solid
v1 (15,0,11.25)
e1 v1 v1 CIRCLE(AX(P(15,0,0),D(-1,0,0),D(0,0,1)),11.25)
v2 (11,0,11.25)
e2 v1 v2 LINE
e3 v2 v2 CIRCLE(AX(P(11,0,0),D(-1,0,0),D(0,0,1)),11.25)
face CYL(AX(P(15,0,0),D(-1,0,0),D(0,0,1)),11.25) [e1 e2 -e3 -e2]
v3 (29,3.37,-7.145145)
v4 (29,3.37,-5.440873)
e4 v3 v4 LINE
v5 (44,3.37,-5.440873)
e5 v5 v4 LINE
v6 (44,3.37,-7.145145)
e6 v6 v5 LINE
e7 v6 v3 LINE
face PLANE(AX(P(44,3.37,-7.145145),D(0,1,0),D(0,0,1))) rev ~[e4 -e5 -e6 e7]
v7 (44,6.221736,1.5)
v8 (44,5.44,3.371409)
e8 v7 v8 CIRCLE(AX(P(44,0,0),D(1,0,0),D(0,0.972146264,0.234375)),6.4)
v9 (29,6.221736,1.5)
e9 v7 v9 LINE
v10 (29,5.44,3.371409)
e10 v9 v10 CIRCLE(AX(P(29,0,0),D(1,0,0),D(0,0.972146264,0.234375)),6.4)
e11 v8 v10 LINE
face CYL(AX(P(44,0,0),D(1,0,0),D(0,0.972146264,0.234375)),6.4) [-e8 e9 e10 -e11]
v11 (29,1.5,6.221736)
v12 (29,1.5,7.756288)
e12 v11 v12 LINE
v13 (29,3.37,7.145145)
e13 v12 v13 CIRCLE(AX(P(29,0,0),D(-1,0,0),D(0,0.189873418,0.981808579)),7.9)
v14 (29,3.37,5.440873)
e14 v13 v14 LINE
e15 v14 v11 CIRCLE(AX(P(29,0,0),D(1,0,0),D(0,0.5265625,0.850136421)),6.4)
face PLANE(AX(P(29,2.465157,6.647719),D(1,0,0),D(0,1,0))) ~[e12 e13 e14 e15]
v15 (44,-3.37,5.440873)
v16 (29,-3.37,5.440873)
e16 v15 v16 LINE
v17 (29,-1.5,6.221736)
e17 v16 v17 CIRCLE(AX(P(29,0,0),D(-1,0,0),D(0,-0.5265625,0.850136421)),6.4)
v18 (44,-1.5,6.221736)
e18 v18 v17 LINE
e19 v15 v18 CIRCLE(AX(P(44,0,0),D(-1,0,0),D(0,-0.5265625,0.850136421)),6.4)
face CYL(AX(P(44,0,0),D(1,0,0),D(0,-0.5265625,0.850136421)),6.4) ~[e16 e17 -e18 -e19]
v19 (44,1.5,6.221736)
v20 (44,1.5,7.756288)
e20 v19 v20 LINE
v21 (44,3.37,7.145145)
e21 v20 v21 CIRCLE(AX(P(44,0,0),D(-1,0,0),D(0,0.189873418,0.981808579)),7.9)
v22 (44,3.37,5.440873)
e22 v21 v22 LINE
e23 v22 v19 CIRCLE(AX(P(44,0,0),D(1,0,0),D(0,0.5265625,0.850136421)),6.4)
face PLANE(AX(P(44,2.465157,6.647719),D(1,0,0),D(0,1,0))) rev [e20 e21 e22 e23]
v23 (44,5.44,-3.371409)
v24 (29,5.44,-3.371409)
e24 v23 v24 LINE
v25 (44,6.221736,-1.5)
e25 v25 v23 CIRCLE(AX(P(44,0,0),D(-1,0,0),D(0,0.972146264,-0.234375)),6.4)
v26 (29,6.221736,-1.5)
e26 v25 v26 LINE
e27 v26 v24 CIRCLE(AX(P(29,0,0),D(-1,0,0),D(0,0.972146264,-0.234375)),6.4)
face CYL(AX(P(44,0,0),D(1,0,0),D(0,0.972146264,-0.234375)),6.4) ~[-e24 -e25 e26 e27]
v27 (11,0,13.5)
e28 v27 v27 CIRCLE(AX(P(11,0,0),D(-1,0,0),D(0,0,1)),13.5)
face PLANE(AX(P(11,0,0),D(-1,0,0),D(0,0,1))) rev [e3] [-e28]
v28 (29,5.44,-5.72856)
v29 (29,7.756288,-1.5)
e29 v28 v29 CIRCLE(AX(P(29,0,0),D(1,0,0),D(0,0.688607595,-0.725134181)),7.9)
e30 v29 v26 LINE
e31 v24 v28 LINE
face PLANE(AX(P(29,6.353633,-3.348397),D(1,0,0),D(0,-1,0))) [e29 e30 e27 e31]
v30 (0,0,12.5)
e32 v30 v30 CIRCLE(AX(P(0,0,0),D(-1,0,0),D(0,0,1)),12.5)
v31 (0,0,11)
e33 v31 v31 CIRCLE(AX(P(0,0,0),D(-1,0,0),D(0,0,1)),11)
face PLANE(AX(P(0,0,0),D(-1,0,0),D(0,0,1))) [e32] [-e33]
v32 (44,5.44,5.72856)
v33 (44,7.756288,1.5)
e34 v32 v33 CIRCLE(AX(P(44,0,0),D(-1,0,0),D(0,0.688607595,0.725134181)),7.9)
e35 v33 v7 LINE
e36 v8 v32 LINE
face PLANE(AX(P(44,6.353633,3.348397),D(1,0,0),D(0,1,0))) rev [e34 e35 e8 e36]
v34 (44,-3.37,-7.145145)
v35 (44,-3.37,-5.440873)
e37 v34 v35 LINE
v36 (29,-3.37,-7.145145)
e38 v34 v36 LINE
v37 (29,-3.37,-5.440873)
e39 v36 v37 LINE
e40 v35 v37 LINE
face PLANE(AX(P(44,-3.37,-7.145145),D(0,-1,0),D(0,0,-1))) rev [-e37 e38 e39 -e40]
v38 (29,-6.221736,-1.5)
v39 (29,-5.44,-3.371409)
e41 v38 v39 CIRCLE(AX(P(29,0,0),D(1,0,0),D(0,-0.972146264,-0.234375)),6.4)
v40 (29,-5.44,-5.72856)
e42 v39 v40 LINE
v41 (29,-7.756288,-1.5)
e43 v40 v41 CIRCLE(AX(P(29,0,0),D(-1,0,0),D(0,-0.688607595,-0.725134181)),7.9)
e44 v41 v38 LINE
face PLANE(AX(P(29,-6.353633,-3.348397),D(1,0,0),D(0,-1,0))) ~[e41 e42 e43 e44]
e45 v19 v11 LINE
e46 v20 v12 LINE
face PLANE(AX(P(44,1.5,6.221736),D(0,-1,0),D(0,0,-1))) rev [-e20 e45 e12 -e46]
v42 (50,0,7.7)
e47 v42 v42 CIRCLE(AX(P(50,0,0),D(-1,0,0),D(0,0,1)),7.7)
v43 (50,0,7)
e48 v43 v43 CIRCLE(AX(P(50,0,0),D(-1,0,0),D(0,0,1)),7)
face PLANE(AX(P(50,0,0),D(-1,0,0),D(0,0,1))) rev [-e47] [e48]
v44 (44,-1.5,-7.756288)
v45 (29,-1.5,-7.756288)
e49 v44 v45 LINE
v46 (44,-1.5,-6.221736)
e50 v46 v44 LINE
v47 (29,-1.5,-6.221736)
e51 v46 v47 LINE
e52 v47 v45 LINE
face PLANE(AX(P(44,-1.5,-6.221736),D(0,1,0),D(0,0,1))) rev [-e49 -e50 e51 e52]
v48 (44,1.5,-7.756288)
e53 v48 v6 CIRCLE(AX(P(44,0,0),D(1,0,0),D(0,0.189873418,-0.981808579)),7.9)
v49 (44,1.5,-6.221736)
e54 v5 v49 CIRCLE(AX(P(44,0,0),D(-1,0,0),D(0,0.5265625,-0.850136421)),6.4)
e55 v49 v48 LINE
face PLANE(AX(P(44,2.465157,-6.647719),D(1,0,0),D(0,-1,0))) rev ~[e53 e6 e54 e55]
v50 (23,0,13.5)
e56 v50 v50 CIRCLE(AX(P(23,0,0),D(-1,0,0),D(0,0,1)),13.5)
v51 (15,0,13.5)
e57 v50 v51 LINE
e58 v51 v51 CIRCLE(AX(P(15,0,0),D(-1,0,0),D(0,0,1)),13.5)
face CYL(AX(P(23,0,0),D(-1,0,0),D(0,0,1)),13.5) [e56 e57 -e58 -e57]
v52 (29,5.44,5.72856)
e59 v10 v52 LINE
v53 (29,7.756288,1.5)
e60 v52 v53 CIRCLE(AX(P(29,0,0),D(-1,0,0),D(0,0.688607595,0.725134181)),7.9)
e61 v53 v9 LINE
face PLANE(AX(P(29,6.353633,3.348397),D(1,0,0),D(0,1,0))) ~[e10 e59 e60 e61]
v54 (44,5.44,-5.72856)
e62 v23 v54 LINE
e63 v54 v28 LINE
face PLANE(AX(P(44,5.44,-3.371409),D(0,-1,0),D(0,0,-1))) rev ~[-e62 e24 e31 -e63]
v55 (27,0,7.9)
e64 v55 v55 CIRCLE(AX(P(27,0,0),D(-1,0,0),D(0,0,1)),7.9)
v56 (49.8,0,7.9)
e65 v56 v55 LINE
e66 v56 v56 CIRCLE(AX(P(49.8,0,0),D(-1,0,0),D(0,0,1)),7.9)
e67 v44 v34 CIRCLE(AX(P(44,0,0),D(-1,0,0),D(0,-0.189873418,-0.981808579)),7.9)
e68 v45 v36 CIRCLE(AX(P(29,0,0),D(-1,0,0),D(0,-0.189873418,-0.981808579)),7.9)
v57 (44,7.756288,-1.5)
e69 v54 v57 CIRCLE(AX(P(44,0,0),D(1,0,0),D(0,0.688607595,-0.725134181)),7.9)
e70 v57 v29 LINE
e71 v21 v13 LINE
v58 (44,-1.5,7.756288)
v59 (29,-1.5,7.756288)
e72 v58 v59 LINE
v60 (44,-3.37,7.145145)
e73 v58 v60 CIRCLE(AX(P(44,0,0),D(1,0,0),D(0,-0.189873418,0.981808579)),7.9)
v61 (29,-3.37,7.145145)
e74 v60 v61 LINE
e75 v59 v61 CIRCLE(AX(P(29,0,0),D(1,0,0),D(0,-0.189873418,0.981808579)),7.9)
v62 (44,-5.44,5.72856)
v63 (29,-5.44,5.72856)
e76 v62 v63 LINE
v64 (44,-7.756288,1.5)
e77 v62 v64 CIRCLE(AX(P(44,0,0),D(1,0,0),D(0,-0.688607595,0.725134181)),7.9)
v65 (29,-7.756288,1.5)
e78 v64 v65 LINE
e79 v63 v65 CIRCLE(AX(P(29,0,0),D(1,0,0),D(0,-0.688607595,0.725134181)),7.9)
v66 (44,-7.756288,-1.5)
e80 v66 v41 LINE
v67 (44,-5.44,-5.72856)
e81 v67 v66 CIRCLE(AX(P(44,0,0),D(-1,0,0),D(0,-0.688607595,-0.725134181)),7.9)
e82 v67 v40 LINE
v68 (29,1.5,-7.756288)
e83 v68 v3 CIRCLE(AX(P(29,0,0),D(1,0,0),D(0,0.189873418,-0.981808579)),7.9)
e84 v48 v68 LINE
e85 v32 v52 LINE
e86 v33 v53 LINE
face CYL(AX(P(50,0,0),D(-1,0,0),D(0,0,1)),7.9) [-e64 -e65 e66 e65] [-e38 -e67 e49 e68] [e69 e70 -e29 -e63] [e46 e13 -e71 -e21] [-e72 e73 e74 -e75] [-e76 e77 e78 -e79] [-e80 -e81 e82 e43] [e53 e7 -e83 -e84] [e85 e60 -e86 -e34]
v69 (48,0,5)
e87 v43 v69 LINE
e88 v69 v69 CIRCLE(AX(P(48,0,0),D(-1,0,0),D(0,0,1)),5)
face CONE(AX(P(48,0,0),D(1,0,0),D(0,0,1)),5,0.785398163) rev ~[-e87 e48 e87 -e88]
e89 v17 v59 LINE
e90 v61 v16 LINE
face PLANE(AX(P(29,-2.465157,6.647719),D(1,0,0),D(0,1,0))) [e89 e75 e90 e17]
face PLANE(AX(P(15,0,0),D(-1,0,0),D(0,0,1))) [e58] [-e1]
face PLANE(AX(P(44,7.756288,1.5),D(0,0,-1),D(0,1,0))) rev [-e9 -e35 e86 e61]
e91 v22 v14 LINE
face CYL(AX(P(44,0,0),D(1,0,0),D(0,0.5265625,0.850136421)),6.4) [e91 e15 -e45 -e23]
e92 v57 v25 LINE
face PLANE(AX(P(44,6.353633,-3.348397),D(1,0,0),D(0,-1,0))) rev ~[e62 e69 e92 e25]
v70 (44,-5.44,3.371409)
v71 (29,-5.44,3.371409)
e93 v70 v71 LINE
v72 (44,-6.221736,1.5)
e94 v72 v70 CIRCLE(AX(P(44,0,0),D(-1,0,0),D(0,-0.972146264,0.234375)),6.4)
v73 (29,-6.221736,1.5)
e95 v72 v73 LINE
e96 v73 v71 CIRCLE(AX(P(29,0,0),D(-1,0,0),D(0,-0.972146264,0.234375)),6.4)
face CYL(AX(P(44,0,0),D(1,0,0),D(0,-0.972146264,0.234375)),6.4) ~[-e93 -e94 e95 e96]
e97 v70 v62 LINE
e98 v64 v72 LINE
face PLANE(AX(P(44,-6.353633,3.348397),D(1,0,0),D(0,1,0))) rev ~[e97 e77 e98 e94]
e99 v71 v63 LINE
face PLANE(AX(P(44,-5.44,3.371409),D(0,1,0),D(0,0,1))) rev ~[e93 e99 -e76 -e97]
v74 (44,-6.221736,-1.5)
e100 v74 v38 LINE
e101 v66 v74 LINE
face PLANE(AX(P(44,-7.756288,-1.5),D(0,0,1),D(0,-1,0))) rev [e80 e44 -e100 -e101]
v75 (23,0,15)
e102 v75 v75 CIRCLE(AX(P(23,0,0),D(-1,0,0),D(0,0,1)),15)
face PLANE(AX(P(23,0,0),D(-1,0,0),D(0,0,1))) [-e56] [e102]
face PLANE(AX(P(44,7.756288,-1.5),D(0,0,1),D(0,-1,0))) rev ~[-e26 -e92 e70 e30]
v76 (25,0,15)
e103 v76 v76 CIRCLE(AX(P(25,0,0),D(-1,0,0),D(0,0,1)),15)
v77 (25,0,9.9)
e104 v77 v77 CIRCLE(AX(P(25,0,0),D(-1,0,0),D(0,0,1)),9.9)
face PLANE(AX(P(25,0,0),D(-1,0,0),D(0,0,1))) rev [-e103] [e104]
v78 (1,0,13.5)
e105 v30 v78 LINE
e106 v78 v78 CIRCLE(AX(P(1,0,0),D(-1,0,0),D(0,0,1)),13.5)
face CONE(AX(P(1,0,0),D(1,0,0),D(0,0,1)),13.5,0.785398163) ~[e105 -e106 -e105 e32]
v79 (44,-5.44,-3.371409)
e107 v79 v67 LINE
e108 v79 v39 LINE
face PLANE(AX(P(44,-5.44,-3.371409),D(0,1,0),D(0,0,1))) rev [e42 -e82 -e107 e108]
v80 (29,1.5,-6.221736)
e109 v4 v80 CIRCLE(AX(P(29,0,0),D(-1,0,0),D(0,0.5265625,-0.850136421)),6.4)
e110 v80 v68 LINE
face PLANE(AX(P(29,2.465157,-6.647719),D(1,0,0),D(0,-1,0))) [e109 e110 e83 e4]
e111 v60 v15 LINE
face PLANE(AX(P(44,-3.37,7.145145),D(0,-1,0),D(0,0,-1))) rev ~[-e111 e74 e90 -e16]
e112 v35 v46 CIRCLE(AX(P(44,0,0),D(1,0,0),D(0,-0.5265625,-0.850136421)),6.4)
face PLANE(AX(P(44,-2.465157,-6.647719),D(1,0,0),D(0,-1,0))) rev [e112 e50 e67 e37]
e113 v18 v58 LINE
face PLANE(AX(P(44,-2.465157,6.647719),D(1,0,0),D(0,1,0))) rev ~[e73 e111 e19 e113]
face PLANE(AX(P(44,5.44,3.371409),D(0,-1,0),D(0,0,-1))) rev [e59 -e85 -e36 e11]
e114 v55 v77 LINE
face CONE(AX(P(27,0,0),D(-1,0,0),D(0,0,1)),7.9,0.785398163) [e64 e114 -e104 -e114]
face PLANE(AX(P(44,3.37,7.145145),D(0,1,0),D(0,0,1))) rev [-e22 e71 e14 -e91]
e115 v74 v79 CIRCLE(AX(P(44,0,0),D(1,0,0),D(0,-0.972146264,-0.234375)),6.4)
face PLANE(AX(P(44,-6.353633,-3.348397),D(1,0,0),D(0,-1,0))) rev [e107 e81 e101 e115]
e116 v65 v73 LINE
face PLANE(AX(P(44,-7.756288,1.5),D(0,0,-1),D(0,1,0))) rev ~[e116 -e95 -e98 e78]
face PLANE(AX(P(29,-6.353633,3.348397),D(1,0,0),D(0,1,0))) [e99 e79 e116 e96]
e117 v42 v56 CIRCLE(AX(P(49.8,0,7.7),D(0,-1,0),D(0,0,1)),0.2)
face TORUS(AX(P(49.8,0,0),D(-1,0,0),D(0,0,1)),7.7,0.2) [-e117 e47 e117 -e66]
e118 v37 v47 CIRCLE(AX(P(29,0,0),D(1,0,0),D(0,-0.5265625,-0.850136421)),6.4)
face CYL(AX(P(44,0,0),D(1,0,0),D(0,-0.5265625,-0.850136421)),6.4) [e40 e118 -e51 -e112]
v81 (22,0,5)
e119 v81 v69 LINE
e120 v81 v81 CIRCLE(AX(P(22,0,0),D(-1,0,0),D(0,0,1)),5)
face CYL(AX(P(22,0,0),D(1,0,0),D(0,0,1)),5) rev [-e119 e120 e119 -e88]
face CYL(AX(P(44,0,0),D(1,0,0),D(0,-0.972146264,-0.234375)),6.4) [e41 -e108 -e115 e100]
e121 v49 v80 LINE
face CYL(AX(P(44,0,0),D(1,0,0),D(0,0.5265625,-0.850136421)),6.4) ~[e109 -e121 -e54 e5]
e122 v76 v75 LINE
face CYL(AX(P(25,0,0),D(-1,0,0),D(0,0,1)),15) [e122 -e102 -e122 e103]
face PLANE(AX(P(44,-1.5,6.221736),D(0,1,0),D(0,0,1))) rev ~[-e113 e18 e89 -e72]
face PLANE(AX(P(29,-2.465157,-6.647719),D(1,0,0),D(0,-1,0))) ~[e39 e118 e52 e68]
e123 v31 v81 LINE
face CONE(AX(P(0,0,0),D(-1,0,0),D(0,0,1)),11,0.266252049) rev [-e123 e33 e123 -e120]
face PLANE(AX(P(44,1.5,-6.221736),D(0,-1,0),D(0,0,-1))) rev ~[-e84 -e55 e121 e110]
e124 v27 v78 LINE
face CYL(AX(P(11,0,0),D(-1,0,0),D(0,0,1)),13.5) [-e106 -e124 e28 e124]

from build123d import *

# Parameters (mm, degrees)
F2_R             = 0.2
F3_SIZE          = 2
F4_SIZE          = 1
F7_DEPTH         = 15
F7_COPIES2_COUNT = 2


# Not quite as in the source:
# - a pattern or mirror of a feature is missing from the dataset's text; its kind, count and spacing are read off the source's solid


with BuildPart() as f1:
    # F0 (on Front) → F1 (revolve)
    with BuildSketch(Plane.XZ):
        Polygon((0, 13.5), (0, 11), (22, 5), (50, 5), (50, 7.9), (25, 7.9), (25, 15), (23, 15), (23, 13.5), (15, 13.5), (15, 11.25), (11, 11.25), (11, 13.5), align=None)
    revolve(axis=Axis((18.4335876124, 0, 0), (-1, 0, 0)))

    # F2
    f2_edges = [f1.edges().sort_by_distance(p)[0] for p in [
        (50, 0, -7.9),
    ]]
    fillet(f2_edges, radius=F2_R)

    # F3
    f3_edges = [f1.edges().sort_by_distance(p)[0] for p in [
        (50, 0, -5),
        (25, 0, -7.9),
    ]]
    chamfer(f3_edges, length=F3_SIZE)

    # F4
    f4_edges = [f1.edges().sort_by_distance(p)[0] for p in [
        (0, 0, -13.5),
    ]]
    chamfer(f4_edges, length=F4_SIZE)

    # F6 (on offset) → F7 (cut)
    with BuildSketch(Plane.YZ.offset(44)):
        with BuildLine():
            ThreePointArc((-3.37, 5.4408730917), (-2.4661025438, 5.905788537), (-1.5, 6.2217360921))
            Line((-1.5, 6.2217360921), (-1.5, 7.7562877719))
            ThreePointArc((-1.5, 7.7562877719), (-2.4540983699, 7.5091544924), (-3.37, 7.145145205))
            Line((-3.37, 7.145145205), (-3.37, 5.4408730917))
        make_face()
        with BuildLine():
            Line((-5.44, 3.3714092009), (-5.44, 5.7285600285))
            ThreePointArc((-5.44, 5.7285600285), (-6.928613333, 3.7953020014), (-7.7562877719, 1.5))
            Line((-7.7562877719, 1.5), (-6.2217360921, 1.5))
            ThreePointArc((-6.2217360921, 1.5), (-5.9054690982, 2.4668673921), (-5.44, 3.3714092009))
        make_face()
    f7 = extrude(amount=-F7_DEPTH, mode=Mode.SUBTRACT)

    # F7_copies: F7 across plane
    add(f7.mirror(Plane.ZX), mode=Mode.SUBTRACT)

    # F7_copies1: F7 across plane
    add(f7.mirror(Plane(origin=(0, 0, 0), x_dir=(-1, 0, 0), z_dir=(0, 0, -1))), mode=Mode.SUBTRACT)

    # F7_copies2: F7 ×2 about axis
    f7_copies2_axis = Axis((0, 0, 0), (1, 0, 0))
    for i in range(1, F7_COPIES2_COUNT):
        add(f7.rotate(f7_copies2_axis, i * 360 / F7_COPIES2_COUNT), mode=Mode.SUBTRACT)


solid = f1.part
